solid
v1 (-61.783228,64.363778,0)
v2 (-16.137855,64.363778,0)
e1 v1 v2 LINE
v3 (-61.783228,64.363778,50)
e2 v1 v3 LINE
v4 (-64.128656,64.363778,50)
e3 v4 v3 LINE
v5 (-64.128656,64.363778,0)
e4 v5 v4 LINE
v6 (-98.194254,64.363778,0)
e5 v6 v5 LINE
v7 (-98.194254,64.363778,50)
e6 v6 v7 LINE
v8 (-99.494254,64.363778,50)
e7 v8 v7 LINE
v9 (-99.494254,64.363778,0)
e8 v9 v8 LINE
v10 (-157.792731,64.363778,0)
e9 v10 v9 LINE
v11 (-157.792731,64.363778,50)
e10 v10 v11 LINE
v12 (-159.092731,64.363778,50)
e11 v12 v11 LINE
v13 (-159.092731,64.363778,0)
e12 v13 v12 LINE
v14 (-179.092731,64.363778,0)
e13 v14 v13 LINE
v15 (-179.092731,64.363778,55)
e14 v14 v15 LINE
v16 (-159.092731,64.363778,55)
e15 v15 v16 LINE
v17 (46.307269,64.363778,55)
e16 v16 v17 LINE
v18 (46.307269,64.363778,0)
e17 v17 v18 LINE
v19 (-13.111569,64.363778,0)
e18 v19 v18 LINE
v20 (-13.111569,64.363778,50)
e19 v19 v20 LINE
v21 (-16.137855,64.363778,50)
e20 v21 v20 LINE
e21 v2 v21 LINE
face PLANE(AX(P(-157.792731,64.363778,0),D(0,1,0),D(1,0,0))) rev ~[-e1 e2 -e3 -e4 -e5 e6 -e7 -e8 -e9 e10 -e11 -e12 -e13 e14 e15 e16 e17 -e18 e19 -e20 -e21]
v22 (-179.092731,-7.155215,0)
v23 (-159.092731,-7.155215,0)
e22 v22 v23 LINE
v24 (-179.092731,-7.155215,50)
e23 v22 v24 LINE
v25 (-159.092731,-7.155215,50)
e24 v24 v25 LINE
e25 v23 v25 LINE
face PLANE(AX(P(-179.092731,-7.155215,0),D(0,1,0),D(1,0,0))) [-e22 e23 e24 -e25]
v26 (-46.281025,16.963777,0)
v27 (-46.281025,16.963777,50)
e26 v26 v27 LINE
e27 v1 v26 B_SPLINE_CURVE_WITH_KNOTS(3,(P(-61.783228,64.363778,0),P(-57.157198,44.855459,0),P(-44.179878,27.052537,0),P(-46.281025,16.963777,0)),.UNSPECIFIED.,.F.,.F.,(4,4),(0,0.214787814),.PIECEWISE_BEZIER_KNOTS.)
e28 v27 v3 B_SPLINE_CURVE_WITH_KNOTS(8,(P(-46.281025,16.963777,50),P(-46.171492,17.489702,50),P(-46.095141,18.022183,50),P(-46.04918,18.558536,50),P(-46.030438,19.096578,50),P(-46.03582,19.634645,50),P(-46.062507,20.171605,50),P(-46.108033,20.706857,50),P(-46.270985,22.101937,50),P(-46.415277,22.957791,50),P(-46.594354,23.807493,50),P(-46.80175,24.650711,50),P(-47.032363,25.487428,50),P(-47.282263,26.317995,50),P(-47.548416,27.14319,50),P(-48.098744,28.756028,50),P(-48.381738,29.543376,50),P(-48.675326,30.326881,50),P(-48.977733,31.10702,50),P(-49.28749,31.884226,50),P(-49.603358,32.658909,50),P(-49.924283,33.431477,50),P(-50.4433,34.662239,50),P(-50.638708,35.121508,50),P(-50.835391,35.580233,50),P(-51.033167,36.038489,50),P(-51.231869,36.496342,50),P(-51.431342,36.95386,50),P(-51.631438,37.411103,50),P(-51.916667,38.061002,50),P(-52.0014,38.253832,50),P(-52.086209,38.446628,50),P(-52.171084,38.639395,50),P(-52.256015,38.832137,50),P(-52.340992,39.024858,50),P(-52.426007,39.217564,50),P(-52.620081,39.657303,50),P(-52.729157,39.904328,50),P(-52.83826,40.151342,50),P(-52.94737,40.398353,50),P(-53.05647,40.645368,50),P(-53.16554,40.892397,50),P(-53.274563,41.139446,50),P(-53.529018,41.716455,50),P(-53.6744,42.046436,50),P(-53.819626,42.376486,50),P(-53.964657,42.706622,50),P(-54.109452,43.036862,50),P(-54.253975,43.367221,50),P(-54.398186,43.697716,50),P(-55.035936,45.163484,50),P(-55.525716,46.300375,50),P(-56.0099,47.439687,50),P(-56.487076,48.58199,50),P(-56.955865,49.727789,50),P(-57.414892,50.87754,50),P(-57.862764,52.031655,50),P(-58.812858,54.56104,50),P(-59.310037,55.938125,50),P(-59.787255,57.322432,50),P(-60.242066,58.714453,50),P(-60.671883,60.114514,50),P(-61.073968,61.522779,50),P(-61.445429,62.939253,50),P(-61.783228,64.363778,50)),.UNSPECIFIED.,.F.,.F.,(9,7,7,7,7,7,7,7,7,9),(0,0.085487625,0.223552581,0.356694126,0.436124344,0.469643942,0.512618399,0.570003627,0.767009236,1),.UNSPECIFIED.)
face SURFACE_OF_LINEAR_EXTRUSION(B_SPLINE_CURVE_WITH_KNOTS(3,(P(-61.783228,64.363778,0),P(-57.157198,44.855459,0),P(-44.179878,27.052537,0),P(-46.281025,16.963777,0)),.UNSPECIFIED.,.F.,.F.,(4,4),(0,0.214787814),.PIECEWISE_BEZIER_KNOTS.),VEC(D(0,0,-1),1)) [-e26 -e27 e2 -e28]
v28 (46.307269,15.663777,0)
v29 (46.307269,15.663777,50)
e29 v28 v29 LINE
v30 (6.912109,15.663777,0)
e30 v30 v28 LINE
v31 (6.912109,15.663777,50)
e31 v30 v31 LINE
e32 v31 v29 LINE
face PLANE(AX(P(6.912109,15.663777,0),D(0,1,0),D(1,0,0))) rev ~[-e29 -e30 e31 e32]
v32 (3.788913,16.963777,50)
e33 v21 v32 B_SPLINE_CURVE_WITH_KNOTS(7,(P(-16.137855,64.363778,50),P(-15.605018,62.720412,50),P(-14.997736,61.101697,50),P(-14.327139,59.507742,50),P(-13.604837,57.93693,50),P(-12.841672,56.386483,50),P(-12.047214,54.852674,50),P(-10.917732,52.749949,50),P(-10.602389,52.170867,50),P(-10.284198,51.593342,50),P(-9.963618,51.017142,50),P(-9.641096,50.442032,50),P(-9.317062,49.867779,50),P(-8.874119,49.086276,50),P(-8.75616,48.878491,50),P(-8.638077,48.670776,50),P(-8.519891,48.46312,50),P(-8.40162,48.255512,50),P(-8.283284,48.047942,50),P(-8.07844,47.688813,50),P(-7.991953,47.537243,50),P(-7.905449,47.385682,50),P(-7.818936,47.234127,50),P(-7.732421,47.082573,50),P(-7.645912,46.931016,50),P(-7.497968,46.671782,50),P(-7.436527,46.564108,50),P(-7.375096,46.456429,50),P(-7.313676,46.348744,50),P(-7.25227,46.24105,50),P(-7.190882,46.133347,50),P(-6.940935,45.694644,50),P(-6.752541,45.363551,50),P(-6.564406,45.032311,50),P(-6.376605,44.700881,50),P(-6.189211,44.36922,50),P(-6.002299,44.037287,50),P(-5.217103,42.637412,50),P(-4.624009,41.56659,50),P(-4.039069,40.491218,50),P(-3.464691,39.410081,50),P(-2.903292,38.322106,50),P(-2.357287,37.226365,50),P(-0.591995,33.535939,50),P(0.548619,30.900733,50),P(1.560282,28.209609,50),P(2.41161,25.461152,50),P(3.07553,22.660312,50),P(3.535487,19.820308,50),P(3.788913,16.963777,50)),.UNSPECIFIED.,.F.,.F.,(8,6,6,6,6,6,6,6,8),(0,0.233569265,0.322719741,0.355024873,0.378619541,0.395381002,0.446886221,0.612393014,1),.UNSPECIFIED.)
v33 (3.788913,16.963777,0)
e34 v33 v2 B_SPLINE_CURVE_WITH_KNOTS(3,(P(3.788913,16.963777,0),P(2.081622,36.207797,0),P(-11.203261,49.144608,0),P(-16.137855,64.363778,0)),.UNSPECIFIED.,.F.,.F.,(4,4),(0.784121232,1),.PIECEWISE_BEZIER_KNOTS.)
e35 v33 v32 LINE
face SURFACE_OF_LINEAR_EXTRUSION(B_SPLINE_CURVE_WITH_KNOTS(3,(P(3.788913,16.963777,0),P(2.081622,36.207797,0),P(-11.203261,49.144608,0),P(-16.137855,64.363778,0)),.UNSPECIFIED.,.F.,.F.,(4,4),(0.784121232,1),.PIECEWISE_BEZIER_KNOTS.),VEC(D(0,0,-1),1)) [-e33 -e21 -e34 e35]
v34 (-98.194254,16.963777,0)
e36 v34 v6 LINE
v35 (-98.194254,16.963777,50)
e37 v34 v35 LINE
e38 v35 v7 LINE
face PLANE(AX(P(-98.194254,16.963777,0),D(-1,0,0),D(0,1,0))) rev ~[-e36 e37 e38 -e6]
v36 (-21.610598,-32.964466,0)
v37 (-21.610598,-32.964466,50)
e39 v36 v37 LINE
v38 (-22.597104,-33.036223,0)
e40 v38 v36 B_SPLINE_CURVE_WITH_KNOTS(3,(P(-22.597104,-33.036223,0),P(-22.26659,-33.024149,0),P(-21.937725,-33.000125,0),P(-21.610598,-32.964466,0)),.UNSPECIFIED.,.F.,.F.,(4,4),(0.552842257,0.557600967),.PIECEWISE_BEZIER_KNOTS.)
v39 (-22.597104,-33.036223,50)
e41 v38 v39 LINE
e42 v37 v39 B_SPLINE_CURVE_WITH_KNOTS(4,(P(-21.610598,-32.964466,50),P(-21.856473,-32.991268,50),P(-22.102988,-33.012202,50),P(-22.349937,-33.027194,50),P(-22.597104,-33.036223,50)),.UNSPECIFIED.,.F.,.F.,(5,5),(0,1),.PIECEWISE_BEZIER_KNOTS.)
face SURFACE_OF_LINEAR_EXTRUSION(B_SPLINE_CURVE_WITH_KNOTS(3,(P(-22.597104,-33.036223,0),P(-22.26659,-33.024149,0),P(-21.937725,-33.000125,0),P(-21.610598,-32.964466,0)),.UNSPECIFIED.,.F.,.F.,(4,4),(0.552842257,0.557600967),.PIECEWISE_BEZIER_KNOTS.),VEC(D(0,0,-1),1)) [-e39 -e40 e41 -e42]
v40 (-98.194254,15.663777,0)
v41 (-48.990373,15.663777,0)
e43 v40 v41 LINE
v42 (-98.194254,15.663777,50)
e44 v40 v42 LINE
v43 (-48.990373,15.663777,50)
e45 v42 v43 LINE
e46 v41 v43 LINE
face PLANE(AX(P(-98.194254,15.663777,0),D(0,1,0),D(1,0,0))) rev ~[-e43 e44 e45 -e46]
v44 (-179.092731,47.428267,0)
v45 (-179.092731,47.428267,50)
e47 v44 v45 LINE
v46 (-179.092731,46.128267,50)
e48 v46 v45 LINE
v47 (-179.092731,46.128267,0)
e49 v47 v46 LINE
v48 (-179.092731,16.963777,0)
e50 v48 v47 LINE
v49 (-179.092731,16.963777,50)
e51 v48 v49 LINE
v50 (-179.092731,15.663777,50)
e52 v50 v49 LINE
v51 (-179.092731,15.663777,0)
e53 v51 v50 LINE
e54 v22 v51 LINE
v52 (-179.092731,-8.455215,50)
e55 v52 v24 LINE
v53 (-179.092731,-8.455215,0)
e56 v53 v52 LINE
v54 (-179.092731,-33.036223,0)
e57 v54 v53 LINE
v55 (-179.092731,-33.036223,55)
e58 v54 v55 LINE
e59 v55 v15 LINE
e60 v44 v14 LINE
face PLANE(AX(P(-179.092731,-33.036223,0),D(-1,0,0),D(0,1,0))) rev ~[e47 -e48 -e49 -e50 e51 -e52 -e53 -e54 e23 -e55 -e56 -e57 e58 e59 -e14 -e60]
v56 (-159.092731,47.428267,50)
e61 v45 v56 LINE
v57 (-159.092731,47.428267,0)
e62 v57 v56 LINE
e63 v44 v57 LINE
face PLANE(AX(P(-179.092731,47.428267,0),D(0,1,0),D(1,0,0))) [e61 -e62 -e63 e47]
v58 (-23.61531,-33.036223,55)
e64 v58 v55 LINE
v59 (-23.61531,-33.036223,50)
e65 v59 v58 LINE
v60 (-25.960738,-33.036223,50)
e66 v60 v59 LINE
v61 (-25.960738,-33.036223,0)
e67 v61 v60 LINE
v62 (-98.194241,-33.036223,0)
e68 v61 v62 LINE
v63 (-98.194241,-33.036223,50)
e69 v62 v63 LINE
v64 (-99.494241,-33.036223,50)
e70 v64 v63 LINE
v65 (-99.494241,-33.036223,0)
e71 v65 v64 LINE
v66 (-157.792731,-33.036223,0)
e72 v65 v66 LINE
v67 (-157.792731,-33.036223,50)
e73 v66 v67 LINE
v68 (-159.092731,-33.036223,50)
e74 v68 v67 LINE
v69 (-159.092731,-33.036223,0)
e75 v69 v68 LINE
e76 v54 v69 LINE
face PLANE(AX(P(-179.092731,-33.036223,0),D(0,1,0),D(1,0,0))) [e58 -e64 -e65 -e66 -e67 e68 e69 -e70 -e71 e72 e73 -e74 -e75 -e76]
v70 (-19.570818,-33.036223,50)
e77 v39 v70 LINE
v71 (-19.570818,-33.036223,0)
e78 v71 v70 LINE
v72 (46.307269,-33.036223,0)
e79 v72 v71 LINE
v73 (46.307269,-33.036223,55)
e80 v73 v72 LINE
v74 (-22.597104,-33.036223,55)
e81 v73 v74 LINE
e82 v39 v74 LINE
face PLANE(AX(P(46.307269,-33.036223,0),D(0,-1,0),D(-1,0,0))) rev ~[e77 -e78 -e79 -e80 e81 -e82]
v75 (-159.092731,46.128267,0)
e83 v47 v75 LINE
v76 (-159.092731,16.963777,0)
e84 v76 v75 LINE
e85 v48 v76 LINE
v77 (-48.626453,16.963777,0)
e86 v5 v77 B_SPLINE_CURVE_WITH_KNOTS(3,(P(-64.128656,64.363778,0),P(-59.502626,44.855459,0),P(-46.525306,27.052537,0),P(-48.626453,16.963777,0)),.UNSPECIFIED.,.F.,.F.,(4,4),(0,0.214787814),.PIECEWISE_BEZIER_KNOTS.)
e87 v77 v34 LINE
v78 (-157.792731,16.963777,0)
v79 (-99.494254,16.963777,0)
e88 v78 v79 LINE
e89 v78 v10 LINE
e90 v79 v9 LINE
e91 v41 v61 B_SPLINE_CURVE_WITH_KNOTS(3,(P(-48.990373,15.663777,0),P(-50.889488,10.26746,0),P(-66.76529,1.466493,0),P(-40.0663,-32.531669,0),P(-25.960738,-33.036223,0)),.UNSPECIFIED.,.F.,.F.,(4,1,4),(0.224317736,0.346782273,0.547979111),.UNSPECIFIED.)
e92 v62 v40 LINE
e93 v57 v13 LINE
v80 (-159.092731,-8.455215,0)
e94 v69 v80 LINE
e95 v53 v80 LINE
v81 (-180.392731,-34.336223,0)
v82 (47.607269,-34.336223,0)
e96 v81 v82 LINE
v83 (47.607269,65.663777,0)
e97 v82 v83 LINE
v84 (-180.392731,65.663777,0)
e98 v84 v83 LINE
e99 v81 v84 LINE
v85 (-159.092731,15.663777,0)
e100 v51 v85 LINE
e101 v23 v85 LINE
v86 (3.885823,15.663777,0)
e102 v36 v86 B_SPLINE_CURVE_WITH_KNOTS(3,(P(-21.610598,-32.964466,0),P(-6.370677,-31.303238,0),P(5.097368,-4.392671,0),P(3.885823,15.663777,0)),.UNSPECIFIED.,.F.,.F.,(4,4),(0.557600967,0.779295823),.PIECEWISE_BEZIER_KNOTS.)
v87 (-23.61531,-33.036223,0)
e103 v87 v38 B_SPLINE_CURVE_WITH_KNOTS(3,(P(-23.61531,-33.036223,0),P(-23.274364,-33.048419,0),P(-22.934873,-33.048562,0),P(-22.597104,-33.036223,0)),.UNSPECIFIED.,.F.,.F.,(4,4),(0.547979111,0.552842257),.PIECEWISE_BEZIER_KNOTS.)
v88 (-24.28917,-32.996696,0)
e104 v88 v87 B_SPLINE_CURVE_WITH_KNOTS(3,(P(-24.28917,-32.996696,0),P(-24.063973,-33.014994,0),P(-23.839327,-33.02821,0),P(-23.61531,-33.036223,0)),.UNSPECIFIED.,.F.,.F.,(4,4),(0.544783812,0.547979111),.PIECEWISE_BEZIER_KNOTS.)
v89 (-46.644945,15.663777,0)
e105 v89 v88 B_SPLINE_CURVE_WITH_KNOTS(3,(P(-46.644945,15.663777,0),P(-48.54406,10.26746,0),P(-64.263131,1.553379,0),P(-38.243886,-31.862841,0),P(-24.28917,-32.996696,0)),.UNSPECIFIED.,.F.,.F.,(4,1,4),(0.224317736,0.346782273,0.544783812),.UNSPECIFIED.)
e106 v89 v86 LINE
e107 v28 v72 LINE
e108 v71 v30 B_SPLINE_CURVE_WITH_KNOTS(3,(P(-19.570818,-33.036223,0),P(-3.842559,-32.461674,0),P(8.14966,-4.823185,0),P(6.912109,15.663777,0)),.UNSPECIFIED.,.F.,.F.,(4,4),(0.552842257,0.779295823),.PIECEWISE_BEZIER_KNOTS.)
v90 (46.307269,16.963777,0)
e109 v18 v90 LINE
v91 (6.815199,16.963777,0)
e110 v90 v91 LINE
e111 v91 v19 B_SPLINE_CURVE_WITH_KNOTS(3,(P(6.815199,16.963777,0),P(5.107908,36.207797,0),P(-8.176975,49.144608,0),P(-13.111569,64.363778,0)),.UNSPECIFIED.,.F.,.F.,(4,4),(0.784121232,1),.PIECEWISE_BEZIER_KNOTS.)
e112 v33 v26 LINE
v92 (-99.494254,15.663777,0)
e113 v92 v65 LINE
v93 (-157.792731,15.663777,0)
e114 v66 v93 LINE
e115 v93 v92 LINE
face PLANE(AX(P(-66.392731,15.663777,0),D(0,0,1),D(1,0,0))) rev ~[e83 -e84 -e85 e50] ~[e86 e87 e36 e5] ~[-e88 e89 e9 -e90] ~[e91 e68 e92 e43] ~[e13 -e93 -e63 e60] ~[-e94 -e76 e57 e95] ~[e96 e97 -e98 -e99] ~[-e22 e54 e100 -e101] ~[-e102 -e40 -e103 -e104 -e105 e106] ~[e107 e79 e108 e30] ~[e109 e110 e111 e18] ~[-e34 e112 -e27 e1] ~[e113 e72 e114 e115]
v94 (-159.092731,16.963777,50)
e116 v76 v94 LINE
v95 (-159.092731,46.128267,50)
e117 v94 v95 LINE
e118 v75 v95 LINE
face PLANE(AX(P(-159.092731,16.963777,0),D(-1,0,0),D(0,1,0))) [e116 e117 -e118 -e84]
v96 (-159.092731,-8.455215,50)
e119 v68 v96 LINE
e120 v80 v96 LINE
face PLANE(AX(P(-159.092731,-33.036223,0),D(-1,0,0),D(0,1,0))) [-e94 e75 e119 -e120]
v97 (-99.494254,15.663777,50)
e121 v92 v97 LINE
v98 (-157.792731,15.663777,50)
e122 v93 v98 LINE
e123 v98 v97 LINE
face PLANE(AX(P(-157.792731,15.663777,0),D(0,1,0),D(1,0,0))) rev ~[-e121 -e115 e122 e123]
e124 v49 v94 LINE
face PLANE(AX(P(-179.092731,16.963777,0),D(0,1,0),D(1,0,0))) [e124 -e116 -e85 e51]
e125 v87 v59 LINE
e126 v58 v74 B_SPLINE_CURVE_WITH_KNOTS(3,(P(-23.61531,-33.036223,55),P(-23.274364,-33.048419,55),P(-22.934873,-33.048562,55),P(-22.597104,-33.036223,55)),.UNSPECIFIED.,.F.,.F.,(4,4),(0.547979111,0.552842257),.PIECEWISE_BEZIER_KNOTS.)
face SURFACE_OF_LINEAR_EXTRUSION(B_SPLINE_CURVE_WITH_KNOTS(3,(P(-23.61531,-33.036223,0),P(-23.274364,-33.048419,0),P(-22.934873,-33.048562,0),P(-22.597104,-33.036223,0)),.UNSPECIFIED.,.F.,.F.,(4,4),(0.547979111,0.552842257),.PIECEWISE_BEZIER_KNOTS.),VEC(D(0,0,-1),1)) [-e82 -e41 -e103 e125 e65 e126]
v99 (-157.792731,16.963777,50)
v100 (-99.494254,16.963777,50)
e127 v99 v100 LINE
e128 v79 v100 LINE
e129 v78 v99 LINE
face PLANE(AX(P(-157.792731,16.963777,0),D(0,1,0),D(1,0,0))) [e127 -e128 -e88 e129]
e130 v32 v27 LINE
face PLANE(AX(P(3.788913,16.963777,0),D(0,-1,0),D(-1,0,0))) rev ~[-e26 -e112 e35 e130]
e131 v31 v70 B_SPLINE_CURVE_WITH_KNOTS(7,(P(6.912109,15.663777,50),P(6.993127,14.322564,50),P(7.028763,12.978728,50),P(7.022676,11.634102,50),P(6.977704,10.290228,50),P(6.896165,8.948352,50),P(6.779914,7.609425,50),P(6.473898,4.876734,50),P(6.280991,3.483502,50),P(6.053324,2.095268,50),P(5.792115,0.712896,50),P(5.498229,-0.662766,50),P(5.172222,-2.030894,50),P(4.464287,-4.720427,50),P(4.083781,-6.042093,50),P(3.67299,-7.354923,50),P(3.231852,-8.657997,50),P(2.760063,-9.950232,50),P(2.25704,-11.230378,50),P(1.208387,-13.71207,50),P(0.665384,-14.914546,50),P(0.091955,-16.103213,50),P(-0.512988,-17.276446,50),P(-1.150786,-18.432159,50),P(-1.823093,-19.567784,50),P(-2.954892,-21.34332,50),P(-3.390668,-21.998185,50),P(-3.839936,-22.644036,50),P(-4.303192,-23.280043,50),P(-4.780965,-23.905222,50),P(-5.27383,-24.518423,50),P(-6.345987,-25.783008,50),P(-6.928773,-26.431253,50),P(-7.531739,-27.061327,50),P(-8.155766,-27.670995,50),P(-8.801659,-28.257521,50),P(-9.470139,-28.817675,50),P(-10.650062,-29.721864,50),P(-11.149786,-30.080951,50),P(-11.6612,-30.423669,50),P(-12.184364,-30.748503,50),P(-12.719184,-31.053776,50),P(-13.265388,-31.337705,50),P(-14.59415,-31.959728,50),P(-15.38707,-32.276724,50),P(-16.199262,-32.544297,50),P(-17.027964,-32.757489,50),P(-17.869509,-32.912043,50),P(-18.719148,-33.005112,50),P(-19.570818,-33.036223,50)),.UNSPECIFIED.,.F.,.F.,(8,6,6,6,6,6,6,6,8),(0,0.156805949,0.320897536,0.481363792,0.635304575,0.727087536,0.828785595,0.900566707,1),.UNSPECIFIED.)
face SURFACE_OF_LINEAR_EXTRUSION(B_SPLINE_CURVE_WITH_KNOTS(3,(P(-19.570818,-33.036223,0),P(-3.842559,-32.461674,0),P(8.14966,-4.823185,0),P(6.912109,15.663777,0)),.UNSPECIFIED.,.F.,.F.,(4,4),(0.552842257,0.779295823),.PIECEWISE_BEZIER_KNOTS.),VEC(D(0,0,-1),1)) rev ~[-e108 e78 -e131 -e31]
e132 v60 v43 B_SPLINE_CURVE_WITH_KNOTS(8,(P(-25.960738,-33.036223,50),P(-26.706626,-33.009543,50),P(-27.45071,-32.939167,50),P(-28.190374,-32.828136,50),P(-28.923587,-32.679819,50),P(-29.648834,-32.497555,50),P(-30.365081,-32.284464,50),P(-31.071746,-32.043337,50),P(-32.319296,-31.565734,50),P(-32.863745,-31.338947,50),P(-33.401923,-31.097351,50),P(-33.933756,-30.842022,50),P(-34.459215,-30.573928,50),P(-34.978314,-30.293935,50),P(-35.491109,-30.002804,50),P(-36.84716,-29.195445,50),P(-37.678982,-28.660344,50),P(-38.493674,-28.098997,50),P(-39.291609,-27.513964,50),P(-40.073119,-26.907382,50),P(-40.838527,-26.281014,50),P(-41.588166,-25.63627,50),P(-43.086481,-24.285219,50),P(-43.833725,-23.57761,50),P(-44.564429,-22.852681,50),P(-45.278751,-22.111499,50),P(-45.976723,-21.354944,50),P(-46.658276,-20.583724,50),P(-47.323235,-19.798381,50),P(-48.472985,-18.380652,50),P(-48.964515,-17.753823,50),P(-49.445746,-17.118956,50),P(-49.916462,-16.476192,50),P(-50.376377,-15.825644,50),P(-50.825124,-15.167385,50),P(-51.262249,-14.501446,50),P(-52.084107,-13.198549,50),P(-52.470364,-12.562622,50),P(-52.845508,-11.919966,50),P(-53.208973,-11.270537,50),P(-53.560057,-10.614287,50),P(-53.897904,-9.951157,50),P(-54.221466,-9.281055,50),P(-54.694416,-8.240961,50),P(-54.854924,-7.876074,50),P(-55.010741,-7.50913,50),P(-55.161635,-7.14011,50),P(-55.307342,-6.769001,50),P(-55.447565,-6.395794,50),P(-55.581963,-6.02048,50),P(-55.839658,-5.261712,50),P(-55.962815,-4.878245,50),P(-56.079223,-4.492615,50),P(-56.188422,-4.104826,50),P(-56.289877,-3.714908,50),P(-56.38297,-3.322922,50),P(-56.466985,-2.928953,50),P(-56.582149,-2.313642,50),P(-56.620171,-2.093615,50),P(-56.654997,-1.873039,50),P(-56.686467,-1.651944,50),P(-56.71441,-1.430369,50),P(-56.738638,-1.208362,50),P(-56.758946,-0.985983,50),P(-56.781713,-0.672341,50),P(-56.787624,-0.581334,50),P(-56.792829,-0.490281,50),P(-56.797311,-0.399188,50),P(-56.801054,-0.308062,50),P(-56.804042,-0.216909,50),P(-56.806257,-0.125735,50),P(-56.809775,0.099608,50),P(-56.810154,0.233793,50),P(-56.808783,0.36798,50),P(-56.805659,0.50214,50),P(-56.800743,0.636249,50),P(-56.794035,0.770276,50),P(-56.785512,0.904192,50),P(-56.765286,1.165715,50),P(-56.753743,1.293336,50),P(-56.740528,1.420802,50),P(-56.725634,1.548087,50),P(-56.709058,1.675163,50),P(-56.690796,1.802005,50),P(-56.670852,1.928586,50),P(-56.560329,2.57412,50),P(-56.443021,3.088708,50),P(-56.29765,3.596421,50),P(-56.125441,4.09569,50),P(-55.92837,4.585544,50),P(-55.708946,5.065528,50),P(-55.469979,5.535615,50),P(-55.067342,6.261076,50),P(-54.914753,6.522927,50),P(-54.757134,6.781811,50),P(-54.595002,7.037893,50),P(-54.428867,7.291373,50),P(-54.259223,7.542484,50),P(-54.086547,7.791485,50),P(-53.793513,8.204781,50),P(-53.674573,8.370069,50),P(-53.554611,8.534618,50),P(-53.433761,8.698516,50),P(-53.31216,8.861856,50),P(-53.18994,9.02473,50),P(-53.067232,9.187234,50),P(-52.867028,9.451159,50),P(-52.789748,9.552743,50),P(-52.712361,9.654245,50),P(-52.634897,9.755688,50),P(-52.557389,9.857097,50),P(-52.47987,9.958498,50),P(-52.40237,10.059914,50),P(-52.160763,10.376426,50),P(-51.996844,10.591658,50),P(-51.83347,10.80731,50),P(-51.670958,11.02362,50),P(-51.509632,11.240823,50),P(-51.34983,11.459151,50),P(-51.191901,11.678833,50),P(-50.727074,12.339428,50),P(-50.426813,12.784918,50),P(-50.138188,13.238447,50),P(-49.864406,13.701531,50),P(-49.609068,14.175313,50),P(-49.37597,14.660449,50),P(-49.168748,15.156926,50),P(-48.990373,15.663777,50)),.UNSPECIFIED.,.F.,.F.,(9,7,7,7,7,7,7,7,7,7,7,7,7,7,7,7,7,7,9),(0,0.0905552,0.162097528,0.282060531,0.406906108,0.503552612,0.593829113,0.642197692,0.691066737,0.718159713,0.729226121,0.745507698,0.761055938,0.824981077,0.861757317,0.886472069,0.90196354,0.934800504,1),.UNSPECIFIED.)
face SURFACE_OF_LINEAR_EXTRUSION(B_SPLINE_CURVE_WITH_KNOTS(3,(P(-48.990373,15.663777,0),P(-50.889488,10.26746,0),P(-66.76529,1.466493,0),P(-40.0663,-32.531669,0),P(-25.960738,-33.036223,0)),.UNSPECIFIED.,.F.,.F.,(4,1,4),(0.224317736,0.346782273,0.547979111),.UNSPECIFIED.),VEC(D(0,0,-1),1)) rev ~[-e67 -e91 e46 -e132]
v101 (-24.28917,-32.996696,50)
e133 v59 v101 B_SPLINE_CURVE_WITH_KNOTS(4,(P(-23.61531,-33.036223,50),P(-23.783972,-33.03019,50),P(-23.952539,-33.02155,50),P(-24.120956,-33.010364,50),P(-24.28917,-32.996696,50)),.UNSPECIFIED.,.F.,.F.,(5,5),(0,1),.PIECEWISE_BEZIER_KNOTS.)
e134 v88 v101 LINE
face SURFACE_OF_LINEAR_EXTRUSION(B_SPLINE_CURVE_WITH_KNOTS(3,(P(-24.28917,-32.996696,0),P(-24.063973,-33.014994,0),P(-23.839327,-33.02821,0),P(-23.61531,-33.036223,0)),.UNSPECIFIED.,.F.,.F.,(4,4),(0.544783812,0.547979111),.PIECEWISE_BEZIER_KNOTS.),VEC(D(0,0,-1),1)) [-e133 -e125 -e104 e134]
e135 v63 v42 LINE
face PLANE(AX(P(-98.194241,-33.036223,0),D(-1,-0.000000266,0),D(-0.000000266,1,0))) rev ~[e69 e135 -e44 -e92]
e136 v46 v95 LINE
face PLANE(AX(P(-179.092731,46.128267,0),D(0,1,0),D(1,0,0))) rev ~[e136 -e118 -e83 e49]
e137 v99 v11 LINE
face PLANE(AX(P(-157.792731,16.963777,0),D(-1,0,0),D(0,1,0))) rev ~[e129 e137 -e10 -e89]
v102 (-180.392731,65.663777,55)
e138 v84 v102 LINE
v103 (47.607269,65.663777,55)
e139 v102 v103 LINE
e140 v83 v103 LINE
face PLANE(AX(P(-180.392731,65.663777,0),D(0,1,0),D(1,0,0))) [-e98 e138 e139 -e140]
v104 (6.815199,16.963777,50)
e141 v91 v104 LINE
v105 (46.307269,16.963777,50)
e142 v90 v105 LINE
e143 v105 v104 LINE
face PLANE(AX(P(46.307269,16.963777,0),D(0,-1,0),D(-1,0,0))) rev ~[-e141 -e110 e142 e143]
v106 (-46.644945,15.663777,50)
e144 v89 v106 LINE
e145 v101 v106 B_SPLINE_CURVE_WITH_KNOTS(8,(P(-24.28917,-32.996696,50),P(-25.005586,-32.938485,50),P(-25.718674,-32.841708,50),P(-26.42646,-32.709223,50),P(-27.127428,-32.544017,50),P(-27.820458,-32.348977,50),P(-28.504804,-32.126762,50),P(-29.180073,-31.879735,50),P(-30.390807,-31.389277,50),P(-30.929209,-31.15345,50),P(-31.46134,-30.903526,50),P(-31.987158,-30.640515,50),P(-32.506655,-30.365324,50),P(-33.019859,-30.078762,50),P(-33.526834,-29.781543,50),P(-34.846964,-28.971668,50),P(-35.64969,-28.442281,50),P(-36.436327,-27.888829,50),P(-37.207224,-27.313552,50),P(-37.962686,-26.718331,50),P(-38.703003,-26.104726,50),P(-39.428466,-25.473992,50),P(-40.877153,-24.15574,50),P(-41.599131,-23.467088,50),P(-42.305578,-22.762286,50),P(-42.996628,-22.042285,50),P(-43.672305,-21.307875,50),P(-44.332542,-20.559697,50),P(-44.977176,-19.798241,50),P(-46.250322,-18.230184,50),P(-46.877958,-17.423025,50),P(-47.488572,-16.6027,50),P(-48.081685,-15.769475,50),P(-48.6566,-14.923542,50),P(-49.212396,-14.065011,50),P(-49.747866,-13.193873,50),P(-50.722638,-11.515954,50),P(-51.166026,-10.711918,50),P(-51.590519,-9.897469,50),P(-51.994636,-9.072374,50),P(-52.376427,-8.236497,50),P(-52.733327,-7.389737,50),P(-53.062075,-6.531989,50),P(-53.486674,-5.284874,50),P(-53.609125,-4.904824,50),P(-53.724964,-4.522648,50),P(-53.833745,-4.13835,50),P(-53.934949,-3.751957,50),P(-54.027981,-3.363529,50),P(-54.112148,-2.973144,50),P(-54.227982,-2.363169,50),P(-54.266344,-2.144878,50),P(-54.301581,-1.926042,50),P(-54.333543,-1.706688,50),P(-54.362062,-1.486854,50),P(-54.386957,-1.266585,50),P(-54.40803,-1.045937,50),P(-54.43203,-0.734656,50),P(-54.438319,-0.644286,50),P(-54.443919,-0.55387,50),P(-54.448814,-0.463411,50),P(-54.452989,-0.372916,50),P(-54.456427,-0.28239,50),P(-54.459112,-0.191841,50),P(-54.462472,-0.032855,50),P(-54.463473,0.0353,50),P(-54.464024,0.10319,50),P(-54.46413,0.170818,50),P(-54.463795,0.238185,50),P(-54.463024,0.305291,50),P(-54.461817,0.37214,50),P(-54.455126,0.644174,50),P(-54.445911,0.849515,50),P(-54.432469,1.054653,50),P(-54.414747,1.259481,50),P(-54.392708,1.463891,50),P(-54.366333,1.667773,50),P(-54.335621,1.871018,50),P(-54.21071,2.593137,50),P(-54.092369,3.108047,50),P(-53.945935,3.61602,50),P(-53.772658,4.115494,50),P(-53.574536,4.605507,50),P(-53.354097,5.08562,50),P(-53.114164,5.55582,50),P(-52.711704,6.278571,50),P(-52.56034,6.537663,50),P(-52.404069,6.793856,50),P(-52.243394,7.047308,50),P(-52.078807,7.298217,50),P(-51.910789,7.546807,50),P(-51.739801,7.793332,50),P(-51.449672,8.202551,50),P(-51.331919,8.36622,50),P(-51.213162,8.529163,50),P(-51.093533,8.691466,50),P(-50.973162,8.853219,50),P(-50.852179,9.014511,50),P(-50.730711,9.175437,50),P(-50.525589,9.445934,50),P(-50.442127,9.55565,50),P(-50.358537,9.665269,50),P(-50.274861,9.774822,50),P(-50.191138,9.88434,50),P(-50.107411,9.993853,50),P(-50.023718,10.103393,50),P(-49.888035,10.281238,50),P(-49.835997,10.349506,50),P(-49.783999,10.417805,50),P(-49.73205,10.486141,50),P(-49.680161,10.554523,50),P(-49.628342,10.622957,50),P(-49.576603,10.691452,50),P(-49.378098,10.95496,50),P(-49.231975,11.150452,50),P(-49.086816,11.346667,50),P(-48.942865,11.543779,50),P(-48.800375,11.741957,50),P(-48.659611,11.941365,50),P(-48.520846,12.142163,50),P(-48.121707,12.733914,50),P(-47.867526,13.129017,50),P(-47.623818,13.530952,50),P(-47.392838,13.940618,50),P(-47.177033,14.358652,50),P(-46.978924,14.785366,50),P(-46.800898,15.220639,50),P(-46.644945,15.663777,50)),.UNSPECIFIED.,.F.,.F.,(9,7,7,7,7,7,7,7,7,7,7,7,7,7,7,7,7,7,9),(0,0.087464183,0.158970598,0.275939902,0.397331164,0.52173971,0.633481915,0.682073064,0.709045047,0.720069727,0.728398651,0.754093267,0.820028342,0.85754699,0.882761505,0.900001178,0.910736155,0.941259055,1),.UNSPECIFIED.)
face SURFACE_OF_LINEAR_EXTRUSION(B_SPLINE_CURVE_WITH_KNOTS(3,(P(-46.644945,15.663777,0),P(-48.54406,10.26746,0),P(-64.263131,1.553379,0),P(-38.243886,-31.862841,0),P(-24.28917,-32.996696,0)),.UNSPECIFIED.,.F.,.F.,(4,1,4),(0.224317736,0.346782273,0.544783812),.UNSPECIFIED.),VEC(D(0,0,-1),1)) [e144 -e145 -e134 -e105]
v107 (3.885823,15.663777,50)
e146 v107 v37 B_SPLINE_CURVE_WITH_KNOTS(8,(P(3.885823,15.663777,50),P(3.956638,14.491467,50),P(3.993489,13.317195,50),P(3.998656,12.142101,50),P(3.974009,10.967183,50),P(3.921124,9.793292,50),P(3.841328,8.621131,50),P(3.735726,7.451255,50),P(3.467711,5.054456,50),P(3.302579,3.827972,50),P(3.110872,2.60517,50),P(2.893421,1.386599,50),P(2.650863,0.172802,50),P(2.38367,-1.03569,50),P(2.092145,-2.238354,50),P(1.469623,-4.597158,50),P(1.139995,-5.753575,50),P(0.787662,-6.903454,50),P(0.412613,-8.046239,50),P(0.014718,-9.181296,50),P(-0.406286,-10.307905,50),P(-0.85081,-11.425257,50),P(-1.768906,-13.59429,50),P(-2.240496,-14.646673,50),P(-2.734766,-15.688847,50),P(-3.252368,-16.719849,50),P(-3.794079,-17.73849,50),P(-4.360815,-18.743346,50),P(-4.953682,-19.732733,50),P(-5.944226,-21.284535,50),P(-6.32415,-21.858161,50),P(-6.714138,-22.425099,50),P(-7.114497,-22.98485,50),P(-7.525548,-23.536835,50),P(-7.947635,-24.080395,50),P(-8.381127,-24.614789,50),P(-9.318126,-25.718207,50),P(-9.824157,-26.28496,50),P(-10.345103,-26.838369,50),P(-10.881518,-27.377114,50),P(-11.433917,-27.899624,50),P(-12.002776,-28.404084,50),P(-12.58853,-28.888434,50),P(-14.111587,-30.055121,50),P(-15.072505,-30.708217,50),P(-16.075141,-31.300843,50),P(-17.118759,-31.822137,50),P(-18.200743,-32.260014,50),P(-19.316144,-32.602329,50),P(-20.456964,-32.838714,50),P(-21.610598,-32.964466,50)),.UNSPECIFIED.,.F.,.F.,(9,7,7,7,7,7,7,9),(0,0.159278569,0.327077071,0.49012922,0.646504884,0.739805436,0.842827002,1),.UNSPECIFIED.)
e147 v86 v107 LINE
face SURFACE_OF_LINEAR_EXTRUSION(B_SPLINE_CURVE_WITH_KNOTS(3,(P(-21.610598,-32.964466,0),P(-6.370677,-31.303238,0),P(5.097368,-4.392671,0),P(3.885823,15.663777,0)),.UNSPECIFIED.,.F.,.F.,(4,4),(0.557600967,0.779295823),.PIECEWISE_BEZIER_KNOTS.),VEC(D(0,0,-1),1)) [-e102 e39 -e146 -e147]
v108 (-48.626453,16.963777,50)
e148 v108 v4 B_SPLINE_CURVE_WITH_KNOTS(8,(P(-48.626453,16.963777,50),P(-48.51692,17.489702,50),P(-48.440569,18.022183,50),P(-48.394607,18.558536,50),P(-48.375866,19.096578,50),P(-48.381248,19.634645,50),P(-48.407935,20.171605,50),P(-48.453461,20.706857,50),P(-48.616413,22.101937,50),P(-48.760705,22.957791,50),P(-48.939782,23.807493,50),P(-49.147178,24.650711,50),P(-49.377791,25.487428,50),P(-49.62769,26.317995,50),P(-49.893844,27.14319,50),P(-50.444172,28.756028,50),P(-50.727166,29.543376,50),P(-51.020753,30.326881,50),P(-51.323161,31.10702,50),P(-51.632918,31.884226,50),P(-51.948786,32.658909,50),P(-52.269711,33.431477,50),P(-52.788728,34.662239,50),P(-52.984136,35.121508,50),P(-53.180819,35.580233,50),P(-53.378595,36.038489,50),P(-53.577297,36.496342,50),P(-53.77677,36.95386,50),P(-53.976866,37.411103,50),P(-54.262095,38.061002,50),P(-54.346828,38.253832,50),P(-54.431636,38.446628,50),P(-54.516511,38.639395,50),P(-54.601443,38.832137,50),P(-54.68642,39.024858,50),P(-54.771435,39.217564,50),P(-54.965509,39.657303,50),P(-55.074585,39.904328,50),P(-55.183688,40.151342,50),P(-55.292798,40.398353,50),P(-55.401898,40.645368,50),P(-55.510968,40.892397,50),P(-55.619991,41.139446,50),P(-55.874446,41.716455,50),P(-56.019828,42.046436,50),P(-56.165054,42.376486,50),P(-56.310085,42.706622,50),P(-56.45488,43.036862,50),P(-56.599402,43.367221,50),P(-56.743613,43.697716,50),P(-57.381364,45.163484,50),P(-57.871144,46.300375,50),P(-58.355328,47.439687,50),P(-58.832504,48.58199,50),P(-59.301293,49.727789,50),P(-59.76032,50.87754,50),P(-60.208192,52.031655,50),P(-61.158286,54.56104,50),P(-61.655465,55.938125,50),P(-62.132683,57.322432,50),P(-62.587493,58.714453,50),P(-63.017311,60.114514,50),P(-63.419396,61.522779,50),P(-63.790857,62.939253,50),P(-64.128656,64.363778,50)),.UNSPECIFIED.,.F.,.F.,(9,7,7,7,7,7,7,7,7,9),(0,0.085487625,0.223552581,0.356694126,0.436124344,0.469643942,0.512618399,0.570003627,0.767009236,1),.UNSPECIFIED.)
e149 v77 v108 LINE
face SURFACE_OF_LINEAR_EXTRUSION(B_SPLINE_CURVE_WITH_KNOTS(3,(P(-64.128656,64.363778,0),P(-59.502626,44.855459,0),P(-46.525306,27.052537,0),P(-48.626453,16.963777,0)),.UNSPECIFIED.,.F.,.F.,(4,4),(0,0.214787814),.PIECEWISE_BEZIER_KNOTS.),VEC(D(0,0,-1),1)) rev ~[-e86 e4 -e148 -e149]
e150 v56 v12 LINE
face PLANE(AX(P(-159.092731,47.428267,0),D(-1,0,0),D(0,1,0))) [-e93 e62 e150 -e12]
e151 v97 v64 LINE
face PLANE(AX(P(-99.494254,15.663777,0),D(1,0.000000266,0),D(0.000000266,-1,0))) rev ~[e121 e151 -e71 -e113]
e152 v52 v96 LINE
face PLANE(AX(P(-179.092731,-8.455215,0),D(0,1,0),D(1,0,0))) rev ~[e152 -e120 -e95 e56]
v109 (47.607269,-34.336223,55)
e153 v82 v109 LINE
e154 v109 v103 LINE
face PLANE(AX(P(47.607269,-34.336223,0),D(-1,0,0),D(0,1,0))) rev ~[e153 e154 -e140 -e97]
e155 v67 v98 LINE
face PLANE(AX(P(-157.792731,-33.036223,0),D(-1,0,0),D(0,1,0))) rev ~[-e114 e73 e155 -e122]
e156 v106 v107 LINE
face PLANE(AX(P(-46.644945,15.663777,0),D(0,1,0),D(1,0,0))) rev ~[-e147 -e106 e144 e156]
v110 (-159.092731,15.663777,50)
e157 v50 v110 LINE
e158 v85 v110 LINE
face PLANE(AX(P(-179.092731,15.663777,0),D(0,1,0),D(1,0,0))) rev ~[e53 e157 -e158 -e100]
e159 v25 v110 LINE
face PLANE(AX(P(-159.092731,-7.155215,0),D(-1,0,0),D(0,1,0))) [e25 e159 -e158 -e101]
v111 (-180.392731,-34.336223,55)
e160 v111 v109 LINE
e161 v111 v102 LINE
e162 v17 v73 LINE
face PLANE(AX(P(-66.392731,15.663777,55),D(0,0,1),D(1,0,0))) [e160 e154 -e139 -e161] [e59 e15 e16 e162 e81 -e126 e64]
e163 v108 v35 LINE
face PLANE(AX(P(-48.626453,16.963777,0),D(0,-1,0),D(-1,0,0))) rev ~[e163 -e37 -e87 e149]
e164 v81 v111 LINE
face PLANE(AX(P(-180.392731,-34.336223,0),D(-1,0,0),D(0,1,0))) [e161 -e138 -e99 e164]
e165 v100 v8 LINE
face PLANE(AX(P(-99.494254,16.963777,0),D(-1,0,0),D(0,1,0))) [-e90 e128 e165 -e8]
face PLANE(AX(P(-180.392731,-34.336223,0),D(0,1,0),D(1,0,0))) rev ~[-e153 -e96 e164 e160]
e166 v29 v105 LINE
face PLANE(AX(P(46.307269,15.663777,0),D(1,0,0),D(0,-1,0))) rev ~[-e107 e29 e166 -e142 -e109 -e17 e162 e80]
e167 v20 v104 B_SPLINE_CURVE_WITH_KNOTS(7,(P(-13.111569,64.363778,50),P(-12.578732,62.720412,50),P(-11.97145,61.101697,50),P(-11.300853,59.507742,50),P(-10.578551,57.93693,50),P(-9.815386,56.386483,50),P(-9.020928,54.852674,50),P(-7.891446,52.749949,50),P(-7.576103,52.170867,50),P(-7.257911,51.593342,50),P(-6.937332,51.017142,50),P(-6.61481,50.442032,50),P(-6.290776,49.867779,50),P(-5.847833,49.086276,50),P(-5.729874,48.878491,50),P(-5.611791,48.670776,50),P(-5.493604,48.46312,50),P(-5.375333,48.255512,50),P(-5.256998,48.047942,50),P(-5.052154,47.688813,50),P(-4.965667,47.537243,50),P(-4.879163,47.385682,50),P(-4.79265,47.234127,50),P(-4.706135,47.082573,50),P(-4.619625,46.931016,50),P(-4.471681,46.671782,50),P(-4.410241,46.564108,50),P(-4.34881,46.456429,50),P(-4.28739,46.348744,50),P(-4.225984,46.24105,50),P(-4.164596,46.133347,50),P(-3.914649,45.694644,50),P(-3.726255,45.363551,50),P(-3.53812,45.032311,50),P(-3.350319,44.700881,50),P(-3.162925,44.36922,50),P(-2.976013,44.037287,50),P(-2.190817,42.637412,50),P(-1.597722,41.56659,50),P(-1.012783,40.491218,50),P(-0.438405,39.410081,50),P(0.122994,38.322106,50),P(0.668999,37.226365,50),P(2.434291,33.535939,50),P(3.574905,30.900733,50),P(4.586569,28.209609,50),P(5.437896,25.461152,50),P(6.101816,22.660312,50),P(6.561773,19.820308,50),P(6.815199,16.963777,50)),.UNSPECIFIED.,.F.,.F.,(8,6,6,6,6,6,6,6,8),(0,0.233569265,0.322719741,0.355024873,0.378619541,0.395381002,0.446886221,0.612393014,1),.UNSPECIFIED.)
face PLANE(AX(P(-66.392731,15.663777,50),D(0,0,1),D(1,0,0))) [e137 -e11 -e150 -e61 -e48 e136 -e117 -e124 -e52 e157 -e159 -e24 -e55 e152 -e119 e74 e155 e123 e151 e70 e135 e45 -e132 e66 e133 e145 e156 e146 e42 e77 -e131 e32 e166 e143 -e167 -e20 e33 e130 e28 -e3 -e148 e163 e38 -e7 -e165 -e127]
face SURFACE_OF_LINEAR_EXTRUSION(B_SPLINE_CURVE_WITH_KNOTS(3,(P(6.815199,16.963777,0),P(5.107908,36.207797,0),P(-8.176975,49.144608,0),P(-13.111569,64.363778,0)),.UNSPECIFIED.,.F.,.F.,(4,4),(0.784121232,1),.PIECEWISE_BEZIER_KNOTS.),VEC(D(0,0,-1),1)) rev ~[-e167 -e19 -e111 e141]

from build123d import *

# Parameters (mm, degrees)
F0_W     = 228
F0_H     = 100
F0_W_2   = 20
F0_H_2   = 24.5810076863
F0_H_3   = 22.8189926594
F0_H_4   = 29.1644897312
F0_W_3   = 58.2984770788
F0_H_5   = 47.4000003457
F0_H_6   = 16.9355106145
F1_DEPTH = 55
F2_W     = 225.4000006914
F2_H     = 97.4000006914
F3_DEPTH = 5


with BuildPart() as f1:
    # F0 (on Top) → F1 (new body)
    with BuildSketch(Plane.XY):
        with Locations((-66.3927308619, 15.6637772918)):
            Rectangle(F0_W, F0_H)
        with Locations((-169.0927312076, -20.7457192108)):
            Rectangle(F0_W_2, F0_H_2, mode=Mode.SUBTRACT)
        Polygon((-99.494241178, -33.0362230539), (-157.7927312076, -33.0362230539), (-157.7927312076, 15.6637772918), (-99.4942541288, 15.6637772918), align=None, mode=Mode.SUBTRACT)
        with Locations((-169.0927312076, 4.254280962)):
            Rectangle(F0_W_2, F0_H_3, mode=Mode.SUBTRACT)
        with BuildLine():
            add(Edge.make_bspline(
                [(-48.9903728661, 15.6637772918), (-50.8894876917, 10.2674604802), (-66.765290357, 1.4664925702), (-40.0663002403, -32.5316685311), (-25.9607383293, -33.0362230539)],
                knots=[0.2243177363, 0.2243177363, 0.2243177363, 0.2243177363, 0.3467822733, 0.5479791111, 0.5479791111, 0.5479791111, 0.5479791111], degree=3))
            Line((-25.9607383293, -33.0362230539), (-98.194241178, -33.0362230539))
            Line((-98.194241178, -33.0362230539), (-98.1942541288, 15.6637772918))
            Line((-98.1942541288, 15.6637772918), (-48.9903728661, 15.6637772918))
        make_face(mode=Mode.SUBTRACT)
        with BuildLine():
            add(Edge.make_bspline(
                [(-21.6105978481, -32.9644661853), (-6.3706766603, -31.3032384951), (5.0973679535, -4.3926706889), (3.8858228363, 15.6637772918)],
                knots=[0.5576009666, 0.5576009666, 0.5576009666, 0.5576009666, 0.7792958229, 0.7792958229, 0.7792958229, 0.7792958229], degree=3))
            add(Edge.make_bspline(
                [(-22.597104311, -33.0362230539), (-22.2665896559, -33.0241494524), (-21.9377248021, -33.0001246607), (-21.6105978481, -32.9644661853)],
                knots=[0.5528422567, 0.5528422567, 0.5528422567, 0.5528422567, 0.5576009666, 0.5576009666, 0.5576009666, 0.5576009666], degree=3))
            add(Edge.make_bspline(
                [(-23.6153104586, -33.0362230539), (-23.2743637388, -33.0484186836), (-22.9348725199, -33.0485616256), (-22.597104311, -33.0362230539)],
                knots=[0.5479791111, 0.5479791111, 0.5479791111, 0.5479791111, 0.5528422567, 0.5528422567, 0.5528422567, 0.5528422567], degree=3))
            add(Edge.make_bspline(
                [(-24.2891701926, -32.9966958469), (-24.0639725183, -33.0149937125), (-23.839327314, -33.0282099937), (-23.6153104586, -33.0362230539)],
                knots=[0.5447838124, 0.5447838124, 0.5447838124, 0.5447838124, 0.5479791111, 0.5479791111, 0.5479791111, 0.5479791111], degree=3))
            add(Edge.make_bspline(
                [(-46.6449449953, 15.6637772918), (-48.5440598209, 10.2674604802), (-64.2631309923, 1.5533788133), (-38.243886485, -31.8628407834), (-24.2891701926, -32.9966958469)],
                knots=[0.2243177363, 0.2243177363, 0.2243177363, 0.2243177363, 0.3467822733, 0.5447838124, 0.5447838124, 0.5447838124, 0.5447838124], degree=3))
            add(Edge.make_bspline(
                [(-46.2810248137, 16.9637772918), (-46.3742506197, 16.5161489966), (-46.4971600312, 16.0837068693), (-46.6449449953, 15.6637772918)],
                knots=[0.2147878138, 0.2147878138, 0.2147878138, 0.2147878138, 0.2243177363, 0.2243177363, 0.2243177363, 0.2243177363], degree=3))
            add(Edge.make_bspline(
                [(-61.7832280695, 64.3637776375), (-57.1571978586, 44.8554591392), (-44.1798779302, 27.0525374476), (-46.2810248137, 16.9637772918)],
                knots=[0, 0, 0, 0, 0.2147878138, 0.2147878138, 0.2147878138, 0.2147878138], degree=3))
            Line((-61.7832280695, 64.3637776375), (-58.7569419295, 64.3637776375))
            Line((-58.7569419295, 64.3637776375), (-18.4832829982, 64.3637776375))
            Line((-18.4832829982, 64.3637776375), (-16.1378551275, 64.3637776375))
            add(Edge.make_bspline(
                [(3.7889127405, 16.9637772918), (2.0816215591, 36.2077970929), (-11.2032608143, 49.1446081038), (-16.1378551275, 64.3637776375)],
                knots=[0.7841212321, 0.7841212321, 0.7841212321, 0.7841212321, 1, 1, 1, 1], degree=3))
            add(Edge.make_bspline(
                [(3.8858228363, 15.6637772918), (3.8594523508, 16.1003258471), (3.8270748012, 16.5336272046), (3.7889127405, 16.9637772918)],
                knots=[0.7792958229, 0.7792958229, 0.7792958229, 0.7792958229, 0.7841212321, 0.7841212321, 0.7841212321, 0.7841212321], degree=3))
        make_face(mode=Mode.SUBTRACT)
        with BuildLine():
            add(Edge.make_bspline(
                [(-19.5708181709, -33.0362230539), (-3.8425589006, -32.4616744452), (8.1496600722, -4.8231850372), (6.9121089764, 15.6637772918)],
                knots=[0.5528422567, 0.5528422567, 0.5528422567, 0.5528422567, 0.7792958229, 0.7792958229, 0.7792958229, 0.7792958229], degree=3))
            Line((6.9121089764, 15.6637772918), (46.3072694838, 15.6637772918))
            Line((46.3072694838, 15.6637772918), (46.3072694838, -33.0362230539))
            Line((46.3072694838, -33.0362230539), (-19.5708181709, -33.0362230539))
        make_face(mode=Mode.SUBTRACT)
        with Locations((-169.0927312076, 31.5460221574)):
            Rectangle(F0_W_2, F0_H_4, mode=Mode.SUBTRACT)
        with Locations((-128.6434926682, 40.6637774646)):
            Rectangle(F0_W_3, F0_H_5, mode=Mode.SUBTRACT)
        with Locations((-169.0927312076, 55.8960223302)):
            Rectangle(F0_W_2, F0_H_6, mode=Mode.SUBTRACT)
        with BuildLine():
            add(Edge.make_bspline(
                [(-64.1286559403, 64.3637776375), (-59.5026257294, 44.8554591392), (-46.525305801, 27.0525374476), (-48.6264526844, 16.9637772918)],
                knots=[0, 0, 0, 0, 0.2147878138, 0.2147878138, 0.2147878138, 0.2147878138], degree=3))
            Line((-48.6264526844, 16.9637772918), (-98.1942541288, 16.9637772918))
            Line((-98.1942541288, 16.9637772918), (-98.1942541288, 64.3637776375))
            Line((-98.1942541288, 64.3637776375), (-64.1286559403, 64.3637776375))
        make_face(mode=Mode.SUBTRACT)
        with BuildLine():
            Line((-13.1115689874, 64.3637776375), (46.3072694838, 64.3637776375))
            Line((46.3072694838, 64.3637776375), (46.3072694838, 16.9637772918))
            Line((46.3072694838, 16.9637772918), (6.8151988806, 16.9637772918))
            add(Edge.make_bspline(
                [(6.8151988806, 16.9637772918), (5.1079076992, 36.2077970929), (-8.1769746743, 49.1446081038), (-13.1115689874, 64.3637776375)],
                knots=[0.7841212321, 0.7841212321, 0.7841212321, 0.7841212321, 1, 1, 1, 1], degree=3))
        make_face(mode=Mode.SUBTRACT)
        with BuildLine():
            Line((1.5403949656, 15.6637772918), (3.8858228363, 15.6637772918))
            add(Edge.make_bspline(
                [(3.8858228363, 15.6637772918), (3.8594523508, 16.1003258471), (3.8270748012, 16.5336272046), (3.7889127405, 16.9637772918)],
                knots=[0.7792958229, 0.7792958229, 0.7792958229, 0.7792958229, 0.7841212321, 0.7841212321, 0.7841212321, 0.7841212321], degree=3))
            Line((3.7889127405, 16.9637772918), (1.4434848698, 16.9637772918))
            add(Edge.make_bspline(
                [(1.5403949656, 15.6637772918), (1.5140244801, 16.1003258471), (1.4816469304, 16.5336272046), (1.4434848698, 16.9637772918)],
                knots=[0.7792958229, 0.7792958229, 0.7792958229, 0.7792958229, 0.7841212321, 0.7841212321, 0.7841212321, 0.7841212321], degree=3))
        make_face()
        with BuildLine():
            Line((-43.6186588553, 15.6637772918), (1.5403949656, 15.6637772918))
            add(Edge.make_bspline(
                [(1.5403949656, 15.6637772918), (1.5140244801, 16.1003258471), (1.4816469304, 16.5336272046), (1.4434848698, 16.9637772918)],
                knots=[0.7792958229, 0.7792958229, 0.7792958229, 0.7792958229, 0.7841212321, 0.7841212321, 0.7841212321, 0.7841212321], degree=3))
            Line((1.4434848698, 16.9637772918), (-43.2547386736, 16.9637772918))
            add(Edge.make_bspline(
                [(-43.2547386736, 16.9637772918), (-43.3479644796, 16.5161489966), (-43.4708738911, 16.0837068693), (-43.6186588553, 15.6637772918)],
                knots=[0.2147878138, 0.2147878138, 0.2147878138, 0.2147878138, 0.2243177363, 0.2243177363, 0.2243177363, 0.2243177363], degree=3))
        make_face()
        with BuildLine():
            Line((-46.6449449953, 15.6637772918), (-43.6186588553, 15.6637772918))
            add(Edge.make_bspline(
                [(-43.2547386736, 16.9637772918), (-43.3479644796, 16.5161489966), (-43.4708738911, 16.0837068693), (-43.6186588553, 15.6637772918)],
                knots=[0.2147878138, 0.2147878138, 0.2147878138, 0.2147878138, 0.2243177363, 0.2243177363, 0.2243177363, 0.2243177363], degree=3))
            Line((-43.2547386736, 16.9637772918), (-46.2810248137, 16.9637772918))
            add(Edge.make_bspline(
                [(-46.2810248137, 16.9637772918), (-46.3742506197, 16.5161489966), (-46.4971600312, 16.0837068693), (-46.6449449953, 15.6637772918)],
                knots=[0.2147878138, 0.2147878138, 0.2147878138, 0.2147878138, 0.2243177363, 0.2243177363, 0.2243177363, 0.2243177363], degree=3))
        make_face()
    extrude(amount=F1_DEPTH)

    # F2 (on face) → F3 (cut)
    with BuildSketch(Plane.XY.offset(55)):
        with Locations((-66.3927308619, 15.6637772918)):
            Rectangle(F2_W, F2_H)
    extrude(amount=-F3_DEPTH, mode=Mode.SUBTRACT)


solid = f1.part
